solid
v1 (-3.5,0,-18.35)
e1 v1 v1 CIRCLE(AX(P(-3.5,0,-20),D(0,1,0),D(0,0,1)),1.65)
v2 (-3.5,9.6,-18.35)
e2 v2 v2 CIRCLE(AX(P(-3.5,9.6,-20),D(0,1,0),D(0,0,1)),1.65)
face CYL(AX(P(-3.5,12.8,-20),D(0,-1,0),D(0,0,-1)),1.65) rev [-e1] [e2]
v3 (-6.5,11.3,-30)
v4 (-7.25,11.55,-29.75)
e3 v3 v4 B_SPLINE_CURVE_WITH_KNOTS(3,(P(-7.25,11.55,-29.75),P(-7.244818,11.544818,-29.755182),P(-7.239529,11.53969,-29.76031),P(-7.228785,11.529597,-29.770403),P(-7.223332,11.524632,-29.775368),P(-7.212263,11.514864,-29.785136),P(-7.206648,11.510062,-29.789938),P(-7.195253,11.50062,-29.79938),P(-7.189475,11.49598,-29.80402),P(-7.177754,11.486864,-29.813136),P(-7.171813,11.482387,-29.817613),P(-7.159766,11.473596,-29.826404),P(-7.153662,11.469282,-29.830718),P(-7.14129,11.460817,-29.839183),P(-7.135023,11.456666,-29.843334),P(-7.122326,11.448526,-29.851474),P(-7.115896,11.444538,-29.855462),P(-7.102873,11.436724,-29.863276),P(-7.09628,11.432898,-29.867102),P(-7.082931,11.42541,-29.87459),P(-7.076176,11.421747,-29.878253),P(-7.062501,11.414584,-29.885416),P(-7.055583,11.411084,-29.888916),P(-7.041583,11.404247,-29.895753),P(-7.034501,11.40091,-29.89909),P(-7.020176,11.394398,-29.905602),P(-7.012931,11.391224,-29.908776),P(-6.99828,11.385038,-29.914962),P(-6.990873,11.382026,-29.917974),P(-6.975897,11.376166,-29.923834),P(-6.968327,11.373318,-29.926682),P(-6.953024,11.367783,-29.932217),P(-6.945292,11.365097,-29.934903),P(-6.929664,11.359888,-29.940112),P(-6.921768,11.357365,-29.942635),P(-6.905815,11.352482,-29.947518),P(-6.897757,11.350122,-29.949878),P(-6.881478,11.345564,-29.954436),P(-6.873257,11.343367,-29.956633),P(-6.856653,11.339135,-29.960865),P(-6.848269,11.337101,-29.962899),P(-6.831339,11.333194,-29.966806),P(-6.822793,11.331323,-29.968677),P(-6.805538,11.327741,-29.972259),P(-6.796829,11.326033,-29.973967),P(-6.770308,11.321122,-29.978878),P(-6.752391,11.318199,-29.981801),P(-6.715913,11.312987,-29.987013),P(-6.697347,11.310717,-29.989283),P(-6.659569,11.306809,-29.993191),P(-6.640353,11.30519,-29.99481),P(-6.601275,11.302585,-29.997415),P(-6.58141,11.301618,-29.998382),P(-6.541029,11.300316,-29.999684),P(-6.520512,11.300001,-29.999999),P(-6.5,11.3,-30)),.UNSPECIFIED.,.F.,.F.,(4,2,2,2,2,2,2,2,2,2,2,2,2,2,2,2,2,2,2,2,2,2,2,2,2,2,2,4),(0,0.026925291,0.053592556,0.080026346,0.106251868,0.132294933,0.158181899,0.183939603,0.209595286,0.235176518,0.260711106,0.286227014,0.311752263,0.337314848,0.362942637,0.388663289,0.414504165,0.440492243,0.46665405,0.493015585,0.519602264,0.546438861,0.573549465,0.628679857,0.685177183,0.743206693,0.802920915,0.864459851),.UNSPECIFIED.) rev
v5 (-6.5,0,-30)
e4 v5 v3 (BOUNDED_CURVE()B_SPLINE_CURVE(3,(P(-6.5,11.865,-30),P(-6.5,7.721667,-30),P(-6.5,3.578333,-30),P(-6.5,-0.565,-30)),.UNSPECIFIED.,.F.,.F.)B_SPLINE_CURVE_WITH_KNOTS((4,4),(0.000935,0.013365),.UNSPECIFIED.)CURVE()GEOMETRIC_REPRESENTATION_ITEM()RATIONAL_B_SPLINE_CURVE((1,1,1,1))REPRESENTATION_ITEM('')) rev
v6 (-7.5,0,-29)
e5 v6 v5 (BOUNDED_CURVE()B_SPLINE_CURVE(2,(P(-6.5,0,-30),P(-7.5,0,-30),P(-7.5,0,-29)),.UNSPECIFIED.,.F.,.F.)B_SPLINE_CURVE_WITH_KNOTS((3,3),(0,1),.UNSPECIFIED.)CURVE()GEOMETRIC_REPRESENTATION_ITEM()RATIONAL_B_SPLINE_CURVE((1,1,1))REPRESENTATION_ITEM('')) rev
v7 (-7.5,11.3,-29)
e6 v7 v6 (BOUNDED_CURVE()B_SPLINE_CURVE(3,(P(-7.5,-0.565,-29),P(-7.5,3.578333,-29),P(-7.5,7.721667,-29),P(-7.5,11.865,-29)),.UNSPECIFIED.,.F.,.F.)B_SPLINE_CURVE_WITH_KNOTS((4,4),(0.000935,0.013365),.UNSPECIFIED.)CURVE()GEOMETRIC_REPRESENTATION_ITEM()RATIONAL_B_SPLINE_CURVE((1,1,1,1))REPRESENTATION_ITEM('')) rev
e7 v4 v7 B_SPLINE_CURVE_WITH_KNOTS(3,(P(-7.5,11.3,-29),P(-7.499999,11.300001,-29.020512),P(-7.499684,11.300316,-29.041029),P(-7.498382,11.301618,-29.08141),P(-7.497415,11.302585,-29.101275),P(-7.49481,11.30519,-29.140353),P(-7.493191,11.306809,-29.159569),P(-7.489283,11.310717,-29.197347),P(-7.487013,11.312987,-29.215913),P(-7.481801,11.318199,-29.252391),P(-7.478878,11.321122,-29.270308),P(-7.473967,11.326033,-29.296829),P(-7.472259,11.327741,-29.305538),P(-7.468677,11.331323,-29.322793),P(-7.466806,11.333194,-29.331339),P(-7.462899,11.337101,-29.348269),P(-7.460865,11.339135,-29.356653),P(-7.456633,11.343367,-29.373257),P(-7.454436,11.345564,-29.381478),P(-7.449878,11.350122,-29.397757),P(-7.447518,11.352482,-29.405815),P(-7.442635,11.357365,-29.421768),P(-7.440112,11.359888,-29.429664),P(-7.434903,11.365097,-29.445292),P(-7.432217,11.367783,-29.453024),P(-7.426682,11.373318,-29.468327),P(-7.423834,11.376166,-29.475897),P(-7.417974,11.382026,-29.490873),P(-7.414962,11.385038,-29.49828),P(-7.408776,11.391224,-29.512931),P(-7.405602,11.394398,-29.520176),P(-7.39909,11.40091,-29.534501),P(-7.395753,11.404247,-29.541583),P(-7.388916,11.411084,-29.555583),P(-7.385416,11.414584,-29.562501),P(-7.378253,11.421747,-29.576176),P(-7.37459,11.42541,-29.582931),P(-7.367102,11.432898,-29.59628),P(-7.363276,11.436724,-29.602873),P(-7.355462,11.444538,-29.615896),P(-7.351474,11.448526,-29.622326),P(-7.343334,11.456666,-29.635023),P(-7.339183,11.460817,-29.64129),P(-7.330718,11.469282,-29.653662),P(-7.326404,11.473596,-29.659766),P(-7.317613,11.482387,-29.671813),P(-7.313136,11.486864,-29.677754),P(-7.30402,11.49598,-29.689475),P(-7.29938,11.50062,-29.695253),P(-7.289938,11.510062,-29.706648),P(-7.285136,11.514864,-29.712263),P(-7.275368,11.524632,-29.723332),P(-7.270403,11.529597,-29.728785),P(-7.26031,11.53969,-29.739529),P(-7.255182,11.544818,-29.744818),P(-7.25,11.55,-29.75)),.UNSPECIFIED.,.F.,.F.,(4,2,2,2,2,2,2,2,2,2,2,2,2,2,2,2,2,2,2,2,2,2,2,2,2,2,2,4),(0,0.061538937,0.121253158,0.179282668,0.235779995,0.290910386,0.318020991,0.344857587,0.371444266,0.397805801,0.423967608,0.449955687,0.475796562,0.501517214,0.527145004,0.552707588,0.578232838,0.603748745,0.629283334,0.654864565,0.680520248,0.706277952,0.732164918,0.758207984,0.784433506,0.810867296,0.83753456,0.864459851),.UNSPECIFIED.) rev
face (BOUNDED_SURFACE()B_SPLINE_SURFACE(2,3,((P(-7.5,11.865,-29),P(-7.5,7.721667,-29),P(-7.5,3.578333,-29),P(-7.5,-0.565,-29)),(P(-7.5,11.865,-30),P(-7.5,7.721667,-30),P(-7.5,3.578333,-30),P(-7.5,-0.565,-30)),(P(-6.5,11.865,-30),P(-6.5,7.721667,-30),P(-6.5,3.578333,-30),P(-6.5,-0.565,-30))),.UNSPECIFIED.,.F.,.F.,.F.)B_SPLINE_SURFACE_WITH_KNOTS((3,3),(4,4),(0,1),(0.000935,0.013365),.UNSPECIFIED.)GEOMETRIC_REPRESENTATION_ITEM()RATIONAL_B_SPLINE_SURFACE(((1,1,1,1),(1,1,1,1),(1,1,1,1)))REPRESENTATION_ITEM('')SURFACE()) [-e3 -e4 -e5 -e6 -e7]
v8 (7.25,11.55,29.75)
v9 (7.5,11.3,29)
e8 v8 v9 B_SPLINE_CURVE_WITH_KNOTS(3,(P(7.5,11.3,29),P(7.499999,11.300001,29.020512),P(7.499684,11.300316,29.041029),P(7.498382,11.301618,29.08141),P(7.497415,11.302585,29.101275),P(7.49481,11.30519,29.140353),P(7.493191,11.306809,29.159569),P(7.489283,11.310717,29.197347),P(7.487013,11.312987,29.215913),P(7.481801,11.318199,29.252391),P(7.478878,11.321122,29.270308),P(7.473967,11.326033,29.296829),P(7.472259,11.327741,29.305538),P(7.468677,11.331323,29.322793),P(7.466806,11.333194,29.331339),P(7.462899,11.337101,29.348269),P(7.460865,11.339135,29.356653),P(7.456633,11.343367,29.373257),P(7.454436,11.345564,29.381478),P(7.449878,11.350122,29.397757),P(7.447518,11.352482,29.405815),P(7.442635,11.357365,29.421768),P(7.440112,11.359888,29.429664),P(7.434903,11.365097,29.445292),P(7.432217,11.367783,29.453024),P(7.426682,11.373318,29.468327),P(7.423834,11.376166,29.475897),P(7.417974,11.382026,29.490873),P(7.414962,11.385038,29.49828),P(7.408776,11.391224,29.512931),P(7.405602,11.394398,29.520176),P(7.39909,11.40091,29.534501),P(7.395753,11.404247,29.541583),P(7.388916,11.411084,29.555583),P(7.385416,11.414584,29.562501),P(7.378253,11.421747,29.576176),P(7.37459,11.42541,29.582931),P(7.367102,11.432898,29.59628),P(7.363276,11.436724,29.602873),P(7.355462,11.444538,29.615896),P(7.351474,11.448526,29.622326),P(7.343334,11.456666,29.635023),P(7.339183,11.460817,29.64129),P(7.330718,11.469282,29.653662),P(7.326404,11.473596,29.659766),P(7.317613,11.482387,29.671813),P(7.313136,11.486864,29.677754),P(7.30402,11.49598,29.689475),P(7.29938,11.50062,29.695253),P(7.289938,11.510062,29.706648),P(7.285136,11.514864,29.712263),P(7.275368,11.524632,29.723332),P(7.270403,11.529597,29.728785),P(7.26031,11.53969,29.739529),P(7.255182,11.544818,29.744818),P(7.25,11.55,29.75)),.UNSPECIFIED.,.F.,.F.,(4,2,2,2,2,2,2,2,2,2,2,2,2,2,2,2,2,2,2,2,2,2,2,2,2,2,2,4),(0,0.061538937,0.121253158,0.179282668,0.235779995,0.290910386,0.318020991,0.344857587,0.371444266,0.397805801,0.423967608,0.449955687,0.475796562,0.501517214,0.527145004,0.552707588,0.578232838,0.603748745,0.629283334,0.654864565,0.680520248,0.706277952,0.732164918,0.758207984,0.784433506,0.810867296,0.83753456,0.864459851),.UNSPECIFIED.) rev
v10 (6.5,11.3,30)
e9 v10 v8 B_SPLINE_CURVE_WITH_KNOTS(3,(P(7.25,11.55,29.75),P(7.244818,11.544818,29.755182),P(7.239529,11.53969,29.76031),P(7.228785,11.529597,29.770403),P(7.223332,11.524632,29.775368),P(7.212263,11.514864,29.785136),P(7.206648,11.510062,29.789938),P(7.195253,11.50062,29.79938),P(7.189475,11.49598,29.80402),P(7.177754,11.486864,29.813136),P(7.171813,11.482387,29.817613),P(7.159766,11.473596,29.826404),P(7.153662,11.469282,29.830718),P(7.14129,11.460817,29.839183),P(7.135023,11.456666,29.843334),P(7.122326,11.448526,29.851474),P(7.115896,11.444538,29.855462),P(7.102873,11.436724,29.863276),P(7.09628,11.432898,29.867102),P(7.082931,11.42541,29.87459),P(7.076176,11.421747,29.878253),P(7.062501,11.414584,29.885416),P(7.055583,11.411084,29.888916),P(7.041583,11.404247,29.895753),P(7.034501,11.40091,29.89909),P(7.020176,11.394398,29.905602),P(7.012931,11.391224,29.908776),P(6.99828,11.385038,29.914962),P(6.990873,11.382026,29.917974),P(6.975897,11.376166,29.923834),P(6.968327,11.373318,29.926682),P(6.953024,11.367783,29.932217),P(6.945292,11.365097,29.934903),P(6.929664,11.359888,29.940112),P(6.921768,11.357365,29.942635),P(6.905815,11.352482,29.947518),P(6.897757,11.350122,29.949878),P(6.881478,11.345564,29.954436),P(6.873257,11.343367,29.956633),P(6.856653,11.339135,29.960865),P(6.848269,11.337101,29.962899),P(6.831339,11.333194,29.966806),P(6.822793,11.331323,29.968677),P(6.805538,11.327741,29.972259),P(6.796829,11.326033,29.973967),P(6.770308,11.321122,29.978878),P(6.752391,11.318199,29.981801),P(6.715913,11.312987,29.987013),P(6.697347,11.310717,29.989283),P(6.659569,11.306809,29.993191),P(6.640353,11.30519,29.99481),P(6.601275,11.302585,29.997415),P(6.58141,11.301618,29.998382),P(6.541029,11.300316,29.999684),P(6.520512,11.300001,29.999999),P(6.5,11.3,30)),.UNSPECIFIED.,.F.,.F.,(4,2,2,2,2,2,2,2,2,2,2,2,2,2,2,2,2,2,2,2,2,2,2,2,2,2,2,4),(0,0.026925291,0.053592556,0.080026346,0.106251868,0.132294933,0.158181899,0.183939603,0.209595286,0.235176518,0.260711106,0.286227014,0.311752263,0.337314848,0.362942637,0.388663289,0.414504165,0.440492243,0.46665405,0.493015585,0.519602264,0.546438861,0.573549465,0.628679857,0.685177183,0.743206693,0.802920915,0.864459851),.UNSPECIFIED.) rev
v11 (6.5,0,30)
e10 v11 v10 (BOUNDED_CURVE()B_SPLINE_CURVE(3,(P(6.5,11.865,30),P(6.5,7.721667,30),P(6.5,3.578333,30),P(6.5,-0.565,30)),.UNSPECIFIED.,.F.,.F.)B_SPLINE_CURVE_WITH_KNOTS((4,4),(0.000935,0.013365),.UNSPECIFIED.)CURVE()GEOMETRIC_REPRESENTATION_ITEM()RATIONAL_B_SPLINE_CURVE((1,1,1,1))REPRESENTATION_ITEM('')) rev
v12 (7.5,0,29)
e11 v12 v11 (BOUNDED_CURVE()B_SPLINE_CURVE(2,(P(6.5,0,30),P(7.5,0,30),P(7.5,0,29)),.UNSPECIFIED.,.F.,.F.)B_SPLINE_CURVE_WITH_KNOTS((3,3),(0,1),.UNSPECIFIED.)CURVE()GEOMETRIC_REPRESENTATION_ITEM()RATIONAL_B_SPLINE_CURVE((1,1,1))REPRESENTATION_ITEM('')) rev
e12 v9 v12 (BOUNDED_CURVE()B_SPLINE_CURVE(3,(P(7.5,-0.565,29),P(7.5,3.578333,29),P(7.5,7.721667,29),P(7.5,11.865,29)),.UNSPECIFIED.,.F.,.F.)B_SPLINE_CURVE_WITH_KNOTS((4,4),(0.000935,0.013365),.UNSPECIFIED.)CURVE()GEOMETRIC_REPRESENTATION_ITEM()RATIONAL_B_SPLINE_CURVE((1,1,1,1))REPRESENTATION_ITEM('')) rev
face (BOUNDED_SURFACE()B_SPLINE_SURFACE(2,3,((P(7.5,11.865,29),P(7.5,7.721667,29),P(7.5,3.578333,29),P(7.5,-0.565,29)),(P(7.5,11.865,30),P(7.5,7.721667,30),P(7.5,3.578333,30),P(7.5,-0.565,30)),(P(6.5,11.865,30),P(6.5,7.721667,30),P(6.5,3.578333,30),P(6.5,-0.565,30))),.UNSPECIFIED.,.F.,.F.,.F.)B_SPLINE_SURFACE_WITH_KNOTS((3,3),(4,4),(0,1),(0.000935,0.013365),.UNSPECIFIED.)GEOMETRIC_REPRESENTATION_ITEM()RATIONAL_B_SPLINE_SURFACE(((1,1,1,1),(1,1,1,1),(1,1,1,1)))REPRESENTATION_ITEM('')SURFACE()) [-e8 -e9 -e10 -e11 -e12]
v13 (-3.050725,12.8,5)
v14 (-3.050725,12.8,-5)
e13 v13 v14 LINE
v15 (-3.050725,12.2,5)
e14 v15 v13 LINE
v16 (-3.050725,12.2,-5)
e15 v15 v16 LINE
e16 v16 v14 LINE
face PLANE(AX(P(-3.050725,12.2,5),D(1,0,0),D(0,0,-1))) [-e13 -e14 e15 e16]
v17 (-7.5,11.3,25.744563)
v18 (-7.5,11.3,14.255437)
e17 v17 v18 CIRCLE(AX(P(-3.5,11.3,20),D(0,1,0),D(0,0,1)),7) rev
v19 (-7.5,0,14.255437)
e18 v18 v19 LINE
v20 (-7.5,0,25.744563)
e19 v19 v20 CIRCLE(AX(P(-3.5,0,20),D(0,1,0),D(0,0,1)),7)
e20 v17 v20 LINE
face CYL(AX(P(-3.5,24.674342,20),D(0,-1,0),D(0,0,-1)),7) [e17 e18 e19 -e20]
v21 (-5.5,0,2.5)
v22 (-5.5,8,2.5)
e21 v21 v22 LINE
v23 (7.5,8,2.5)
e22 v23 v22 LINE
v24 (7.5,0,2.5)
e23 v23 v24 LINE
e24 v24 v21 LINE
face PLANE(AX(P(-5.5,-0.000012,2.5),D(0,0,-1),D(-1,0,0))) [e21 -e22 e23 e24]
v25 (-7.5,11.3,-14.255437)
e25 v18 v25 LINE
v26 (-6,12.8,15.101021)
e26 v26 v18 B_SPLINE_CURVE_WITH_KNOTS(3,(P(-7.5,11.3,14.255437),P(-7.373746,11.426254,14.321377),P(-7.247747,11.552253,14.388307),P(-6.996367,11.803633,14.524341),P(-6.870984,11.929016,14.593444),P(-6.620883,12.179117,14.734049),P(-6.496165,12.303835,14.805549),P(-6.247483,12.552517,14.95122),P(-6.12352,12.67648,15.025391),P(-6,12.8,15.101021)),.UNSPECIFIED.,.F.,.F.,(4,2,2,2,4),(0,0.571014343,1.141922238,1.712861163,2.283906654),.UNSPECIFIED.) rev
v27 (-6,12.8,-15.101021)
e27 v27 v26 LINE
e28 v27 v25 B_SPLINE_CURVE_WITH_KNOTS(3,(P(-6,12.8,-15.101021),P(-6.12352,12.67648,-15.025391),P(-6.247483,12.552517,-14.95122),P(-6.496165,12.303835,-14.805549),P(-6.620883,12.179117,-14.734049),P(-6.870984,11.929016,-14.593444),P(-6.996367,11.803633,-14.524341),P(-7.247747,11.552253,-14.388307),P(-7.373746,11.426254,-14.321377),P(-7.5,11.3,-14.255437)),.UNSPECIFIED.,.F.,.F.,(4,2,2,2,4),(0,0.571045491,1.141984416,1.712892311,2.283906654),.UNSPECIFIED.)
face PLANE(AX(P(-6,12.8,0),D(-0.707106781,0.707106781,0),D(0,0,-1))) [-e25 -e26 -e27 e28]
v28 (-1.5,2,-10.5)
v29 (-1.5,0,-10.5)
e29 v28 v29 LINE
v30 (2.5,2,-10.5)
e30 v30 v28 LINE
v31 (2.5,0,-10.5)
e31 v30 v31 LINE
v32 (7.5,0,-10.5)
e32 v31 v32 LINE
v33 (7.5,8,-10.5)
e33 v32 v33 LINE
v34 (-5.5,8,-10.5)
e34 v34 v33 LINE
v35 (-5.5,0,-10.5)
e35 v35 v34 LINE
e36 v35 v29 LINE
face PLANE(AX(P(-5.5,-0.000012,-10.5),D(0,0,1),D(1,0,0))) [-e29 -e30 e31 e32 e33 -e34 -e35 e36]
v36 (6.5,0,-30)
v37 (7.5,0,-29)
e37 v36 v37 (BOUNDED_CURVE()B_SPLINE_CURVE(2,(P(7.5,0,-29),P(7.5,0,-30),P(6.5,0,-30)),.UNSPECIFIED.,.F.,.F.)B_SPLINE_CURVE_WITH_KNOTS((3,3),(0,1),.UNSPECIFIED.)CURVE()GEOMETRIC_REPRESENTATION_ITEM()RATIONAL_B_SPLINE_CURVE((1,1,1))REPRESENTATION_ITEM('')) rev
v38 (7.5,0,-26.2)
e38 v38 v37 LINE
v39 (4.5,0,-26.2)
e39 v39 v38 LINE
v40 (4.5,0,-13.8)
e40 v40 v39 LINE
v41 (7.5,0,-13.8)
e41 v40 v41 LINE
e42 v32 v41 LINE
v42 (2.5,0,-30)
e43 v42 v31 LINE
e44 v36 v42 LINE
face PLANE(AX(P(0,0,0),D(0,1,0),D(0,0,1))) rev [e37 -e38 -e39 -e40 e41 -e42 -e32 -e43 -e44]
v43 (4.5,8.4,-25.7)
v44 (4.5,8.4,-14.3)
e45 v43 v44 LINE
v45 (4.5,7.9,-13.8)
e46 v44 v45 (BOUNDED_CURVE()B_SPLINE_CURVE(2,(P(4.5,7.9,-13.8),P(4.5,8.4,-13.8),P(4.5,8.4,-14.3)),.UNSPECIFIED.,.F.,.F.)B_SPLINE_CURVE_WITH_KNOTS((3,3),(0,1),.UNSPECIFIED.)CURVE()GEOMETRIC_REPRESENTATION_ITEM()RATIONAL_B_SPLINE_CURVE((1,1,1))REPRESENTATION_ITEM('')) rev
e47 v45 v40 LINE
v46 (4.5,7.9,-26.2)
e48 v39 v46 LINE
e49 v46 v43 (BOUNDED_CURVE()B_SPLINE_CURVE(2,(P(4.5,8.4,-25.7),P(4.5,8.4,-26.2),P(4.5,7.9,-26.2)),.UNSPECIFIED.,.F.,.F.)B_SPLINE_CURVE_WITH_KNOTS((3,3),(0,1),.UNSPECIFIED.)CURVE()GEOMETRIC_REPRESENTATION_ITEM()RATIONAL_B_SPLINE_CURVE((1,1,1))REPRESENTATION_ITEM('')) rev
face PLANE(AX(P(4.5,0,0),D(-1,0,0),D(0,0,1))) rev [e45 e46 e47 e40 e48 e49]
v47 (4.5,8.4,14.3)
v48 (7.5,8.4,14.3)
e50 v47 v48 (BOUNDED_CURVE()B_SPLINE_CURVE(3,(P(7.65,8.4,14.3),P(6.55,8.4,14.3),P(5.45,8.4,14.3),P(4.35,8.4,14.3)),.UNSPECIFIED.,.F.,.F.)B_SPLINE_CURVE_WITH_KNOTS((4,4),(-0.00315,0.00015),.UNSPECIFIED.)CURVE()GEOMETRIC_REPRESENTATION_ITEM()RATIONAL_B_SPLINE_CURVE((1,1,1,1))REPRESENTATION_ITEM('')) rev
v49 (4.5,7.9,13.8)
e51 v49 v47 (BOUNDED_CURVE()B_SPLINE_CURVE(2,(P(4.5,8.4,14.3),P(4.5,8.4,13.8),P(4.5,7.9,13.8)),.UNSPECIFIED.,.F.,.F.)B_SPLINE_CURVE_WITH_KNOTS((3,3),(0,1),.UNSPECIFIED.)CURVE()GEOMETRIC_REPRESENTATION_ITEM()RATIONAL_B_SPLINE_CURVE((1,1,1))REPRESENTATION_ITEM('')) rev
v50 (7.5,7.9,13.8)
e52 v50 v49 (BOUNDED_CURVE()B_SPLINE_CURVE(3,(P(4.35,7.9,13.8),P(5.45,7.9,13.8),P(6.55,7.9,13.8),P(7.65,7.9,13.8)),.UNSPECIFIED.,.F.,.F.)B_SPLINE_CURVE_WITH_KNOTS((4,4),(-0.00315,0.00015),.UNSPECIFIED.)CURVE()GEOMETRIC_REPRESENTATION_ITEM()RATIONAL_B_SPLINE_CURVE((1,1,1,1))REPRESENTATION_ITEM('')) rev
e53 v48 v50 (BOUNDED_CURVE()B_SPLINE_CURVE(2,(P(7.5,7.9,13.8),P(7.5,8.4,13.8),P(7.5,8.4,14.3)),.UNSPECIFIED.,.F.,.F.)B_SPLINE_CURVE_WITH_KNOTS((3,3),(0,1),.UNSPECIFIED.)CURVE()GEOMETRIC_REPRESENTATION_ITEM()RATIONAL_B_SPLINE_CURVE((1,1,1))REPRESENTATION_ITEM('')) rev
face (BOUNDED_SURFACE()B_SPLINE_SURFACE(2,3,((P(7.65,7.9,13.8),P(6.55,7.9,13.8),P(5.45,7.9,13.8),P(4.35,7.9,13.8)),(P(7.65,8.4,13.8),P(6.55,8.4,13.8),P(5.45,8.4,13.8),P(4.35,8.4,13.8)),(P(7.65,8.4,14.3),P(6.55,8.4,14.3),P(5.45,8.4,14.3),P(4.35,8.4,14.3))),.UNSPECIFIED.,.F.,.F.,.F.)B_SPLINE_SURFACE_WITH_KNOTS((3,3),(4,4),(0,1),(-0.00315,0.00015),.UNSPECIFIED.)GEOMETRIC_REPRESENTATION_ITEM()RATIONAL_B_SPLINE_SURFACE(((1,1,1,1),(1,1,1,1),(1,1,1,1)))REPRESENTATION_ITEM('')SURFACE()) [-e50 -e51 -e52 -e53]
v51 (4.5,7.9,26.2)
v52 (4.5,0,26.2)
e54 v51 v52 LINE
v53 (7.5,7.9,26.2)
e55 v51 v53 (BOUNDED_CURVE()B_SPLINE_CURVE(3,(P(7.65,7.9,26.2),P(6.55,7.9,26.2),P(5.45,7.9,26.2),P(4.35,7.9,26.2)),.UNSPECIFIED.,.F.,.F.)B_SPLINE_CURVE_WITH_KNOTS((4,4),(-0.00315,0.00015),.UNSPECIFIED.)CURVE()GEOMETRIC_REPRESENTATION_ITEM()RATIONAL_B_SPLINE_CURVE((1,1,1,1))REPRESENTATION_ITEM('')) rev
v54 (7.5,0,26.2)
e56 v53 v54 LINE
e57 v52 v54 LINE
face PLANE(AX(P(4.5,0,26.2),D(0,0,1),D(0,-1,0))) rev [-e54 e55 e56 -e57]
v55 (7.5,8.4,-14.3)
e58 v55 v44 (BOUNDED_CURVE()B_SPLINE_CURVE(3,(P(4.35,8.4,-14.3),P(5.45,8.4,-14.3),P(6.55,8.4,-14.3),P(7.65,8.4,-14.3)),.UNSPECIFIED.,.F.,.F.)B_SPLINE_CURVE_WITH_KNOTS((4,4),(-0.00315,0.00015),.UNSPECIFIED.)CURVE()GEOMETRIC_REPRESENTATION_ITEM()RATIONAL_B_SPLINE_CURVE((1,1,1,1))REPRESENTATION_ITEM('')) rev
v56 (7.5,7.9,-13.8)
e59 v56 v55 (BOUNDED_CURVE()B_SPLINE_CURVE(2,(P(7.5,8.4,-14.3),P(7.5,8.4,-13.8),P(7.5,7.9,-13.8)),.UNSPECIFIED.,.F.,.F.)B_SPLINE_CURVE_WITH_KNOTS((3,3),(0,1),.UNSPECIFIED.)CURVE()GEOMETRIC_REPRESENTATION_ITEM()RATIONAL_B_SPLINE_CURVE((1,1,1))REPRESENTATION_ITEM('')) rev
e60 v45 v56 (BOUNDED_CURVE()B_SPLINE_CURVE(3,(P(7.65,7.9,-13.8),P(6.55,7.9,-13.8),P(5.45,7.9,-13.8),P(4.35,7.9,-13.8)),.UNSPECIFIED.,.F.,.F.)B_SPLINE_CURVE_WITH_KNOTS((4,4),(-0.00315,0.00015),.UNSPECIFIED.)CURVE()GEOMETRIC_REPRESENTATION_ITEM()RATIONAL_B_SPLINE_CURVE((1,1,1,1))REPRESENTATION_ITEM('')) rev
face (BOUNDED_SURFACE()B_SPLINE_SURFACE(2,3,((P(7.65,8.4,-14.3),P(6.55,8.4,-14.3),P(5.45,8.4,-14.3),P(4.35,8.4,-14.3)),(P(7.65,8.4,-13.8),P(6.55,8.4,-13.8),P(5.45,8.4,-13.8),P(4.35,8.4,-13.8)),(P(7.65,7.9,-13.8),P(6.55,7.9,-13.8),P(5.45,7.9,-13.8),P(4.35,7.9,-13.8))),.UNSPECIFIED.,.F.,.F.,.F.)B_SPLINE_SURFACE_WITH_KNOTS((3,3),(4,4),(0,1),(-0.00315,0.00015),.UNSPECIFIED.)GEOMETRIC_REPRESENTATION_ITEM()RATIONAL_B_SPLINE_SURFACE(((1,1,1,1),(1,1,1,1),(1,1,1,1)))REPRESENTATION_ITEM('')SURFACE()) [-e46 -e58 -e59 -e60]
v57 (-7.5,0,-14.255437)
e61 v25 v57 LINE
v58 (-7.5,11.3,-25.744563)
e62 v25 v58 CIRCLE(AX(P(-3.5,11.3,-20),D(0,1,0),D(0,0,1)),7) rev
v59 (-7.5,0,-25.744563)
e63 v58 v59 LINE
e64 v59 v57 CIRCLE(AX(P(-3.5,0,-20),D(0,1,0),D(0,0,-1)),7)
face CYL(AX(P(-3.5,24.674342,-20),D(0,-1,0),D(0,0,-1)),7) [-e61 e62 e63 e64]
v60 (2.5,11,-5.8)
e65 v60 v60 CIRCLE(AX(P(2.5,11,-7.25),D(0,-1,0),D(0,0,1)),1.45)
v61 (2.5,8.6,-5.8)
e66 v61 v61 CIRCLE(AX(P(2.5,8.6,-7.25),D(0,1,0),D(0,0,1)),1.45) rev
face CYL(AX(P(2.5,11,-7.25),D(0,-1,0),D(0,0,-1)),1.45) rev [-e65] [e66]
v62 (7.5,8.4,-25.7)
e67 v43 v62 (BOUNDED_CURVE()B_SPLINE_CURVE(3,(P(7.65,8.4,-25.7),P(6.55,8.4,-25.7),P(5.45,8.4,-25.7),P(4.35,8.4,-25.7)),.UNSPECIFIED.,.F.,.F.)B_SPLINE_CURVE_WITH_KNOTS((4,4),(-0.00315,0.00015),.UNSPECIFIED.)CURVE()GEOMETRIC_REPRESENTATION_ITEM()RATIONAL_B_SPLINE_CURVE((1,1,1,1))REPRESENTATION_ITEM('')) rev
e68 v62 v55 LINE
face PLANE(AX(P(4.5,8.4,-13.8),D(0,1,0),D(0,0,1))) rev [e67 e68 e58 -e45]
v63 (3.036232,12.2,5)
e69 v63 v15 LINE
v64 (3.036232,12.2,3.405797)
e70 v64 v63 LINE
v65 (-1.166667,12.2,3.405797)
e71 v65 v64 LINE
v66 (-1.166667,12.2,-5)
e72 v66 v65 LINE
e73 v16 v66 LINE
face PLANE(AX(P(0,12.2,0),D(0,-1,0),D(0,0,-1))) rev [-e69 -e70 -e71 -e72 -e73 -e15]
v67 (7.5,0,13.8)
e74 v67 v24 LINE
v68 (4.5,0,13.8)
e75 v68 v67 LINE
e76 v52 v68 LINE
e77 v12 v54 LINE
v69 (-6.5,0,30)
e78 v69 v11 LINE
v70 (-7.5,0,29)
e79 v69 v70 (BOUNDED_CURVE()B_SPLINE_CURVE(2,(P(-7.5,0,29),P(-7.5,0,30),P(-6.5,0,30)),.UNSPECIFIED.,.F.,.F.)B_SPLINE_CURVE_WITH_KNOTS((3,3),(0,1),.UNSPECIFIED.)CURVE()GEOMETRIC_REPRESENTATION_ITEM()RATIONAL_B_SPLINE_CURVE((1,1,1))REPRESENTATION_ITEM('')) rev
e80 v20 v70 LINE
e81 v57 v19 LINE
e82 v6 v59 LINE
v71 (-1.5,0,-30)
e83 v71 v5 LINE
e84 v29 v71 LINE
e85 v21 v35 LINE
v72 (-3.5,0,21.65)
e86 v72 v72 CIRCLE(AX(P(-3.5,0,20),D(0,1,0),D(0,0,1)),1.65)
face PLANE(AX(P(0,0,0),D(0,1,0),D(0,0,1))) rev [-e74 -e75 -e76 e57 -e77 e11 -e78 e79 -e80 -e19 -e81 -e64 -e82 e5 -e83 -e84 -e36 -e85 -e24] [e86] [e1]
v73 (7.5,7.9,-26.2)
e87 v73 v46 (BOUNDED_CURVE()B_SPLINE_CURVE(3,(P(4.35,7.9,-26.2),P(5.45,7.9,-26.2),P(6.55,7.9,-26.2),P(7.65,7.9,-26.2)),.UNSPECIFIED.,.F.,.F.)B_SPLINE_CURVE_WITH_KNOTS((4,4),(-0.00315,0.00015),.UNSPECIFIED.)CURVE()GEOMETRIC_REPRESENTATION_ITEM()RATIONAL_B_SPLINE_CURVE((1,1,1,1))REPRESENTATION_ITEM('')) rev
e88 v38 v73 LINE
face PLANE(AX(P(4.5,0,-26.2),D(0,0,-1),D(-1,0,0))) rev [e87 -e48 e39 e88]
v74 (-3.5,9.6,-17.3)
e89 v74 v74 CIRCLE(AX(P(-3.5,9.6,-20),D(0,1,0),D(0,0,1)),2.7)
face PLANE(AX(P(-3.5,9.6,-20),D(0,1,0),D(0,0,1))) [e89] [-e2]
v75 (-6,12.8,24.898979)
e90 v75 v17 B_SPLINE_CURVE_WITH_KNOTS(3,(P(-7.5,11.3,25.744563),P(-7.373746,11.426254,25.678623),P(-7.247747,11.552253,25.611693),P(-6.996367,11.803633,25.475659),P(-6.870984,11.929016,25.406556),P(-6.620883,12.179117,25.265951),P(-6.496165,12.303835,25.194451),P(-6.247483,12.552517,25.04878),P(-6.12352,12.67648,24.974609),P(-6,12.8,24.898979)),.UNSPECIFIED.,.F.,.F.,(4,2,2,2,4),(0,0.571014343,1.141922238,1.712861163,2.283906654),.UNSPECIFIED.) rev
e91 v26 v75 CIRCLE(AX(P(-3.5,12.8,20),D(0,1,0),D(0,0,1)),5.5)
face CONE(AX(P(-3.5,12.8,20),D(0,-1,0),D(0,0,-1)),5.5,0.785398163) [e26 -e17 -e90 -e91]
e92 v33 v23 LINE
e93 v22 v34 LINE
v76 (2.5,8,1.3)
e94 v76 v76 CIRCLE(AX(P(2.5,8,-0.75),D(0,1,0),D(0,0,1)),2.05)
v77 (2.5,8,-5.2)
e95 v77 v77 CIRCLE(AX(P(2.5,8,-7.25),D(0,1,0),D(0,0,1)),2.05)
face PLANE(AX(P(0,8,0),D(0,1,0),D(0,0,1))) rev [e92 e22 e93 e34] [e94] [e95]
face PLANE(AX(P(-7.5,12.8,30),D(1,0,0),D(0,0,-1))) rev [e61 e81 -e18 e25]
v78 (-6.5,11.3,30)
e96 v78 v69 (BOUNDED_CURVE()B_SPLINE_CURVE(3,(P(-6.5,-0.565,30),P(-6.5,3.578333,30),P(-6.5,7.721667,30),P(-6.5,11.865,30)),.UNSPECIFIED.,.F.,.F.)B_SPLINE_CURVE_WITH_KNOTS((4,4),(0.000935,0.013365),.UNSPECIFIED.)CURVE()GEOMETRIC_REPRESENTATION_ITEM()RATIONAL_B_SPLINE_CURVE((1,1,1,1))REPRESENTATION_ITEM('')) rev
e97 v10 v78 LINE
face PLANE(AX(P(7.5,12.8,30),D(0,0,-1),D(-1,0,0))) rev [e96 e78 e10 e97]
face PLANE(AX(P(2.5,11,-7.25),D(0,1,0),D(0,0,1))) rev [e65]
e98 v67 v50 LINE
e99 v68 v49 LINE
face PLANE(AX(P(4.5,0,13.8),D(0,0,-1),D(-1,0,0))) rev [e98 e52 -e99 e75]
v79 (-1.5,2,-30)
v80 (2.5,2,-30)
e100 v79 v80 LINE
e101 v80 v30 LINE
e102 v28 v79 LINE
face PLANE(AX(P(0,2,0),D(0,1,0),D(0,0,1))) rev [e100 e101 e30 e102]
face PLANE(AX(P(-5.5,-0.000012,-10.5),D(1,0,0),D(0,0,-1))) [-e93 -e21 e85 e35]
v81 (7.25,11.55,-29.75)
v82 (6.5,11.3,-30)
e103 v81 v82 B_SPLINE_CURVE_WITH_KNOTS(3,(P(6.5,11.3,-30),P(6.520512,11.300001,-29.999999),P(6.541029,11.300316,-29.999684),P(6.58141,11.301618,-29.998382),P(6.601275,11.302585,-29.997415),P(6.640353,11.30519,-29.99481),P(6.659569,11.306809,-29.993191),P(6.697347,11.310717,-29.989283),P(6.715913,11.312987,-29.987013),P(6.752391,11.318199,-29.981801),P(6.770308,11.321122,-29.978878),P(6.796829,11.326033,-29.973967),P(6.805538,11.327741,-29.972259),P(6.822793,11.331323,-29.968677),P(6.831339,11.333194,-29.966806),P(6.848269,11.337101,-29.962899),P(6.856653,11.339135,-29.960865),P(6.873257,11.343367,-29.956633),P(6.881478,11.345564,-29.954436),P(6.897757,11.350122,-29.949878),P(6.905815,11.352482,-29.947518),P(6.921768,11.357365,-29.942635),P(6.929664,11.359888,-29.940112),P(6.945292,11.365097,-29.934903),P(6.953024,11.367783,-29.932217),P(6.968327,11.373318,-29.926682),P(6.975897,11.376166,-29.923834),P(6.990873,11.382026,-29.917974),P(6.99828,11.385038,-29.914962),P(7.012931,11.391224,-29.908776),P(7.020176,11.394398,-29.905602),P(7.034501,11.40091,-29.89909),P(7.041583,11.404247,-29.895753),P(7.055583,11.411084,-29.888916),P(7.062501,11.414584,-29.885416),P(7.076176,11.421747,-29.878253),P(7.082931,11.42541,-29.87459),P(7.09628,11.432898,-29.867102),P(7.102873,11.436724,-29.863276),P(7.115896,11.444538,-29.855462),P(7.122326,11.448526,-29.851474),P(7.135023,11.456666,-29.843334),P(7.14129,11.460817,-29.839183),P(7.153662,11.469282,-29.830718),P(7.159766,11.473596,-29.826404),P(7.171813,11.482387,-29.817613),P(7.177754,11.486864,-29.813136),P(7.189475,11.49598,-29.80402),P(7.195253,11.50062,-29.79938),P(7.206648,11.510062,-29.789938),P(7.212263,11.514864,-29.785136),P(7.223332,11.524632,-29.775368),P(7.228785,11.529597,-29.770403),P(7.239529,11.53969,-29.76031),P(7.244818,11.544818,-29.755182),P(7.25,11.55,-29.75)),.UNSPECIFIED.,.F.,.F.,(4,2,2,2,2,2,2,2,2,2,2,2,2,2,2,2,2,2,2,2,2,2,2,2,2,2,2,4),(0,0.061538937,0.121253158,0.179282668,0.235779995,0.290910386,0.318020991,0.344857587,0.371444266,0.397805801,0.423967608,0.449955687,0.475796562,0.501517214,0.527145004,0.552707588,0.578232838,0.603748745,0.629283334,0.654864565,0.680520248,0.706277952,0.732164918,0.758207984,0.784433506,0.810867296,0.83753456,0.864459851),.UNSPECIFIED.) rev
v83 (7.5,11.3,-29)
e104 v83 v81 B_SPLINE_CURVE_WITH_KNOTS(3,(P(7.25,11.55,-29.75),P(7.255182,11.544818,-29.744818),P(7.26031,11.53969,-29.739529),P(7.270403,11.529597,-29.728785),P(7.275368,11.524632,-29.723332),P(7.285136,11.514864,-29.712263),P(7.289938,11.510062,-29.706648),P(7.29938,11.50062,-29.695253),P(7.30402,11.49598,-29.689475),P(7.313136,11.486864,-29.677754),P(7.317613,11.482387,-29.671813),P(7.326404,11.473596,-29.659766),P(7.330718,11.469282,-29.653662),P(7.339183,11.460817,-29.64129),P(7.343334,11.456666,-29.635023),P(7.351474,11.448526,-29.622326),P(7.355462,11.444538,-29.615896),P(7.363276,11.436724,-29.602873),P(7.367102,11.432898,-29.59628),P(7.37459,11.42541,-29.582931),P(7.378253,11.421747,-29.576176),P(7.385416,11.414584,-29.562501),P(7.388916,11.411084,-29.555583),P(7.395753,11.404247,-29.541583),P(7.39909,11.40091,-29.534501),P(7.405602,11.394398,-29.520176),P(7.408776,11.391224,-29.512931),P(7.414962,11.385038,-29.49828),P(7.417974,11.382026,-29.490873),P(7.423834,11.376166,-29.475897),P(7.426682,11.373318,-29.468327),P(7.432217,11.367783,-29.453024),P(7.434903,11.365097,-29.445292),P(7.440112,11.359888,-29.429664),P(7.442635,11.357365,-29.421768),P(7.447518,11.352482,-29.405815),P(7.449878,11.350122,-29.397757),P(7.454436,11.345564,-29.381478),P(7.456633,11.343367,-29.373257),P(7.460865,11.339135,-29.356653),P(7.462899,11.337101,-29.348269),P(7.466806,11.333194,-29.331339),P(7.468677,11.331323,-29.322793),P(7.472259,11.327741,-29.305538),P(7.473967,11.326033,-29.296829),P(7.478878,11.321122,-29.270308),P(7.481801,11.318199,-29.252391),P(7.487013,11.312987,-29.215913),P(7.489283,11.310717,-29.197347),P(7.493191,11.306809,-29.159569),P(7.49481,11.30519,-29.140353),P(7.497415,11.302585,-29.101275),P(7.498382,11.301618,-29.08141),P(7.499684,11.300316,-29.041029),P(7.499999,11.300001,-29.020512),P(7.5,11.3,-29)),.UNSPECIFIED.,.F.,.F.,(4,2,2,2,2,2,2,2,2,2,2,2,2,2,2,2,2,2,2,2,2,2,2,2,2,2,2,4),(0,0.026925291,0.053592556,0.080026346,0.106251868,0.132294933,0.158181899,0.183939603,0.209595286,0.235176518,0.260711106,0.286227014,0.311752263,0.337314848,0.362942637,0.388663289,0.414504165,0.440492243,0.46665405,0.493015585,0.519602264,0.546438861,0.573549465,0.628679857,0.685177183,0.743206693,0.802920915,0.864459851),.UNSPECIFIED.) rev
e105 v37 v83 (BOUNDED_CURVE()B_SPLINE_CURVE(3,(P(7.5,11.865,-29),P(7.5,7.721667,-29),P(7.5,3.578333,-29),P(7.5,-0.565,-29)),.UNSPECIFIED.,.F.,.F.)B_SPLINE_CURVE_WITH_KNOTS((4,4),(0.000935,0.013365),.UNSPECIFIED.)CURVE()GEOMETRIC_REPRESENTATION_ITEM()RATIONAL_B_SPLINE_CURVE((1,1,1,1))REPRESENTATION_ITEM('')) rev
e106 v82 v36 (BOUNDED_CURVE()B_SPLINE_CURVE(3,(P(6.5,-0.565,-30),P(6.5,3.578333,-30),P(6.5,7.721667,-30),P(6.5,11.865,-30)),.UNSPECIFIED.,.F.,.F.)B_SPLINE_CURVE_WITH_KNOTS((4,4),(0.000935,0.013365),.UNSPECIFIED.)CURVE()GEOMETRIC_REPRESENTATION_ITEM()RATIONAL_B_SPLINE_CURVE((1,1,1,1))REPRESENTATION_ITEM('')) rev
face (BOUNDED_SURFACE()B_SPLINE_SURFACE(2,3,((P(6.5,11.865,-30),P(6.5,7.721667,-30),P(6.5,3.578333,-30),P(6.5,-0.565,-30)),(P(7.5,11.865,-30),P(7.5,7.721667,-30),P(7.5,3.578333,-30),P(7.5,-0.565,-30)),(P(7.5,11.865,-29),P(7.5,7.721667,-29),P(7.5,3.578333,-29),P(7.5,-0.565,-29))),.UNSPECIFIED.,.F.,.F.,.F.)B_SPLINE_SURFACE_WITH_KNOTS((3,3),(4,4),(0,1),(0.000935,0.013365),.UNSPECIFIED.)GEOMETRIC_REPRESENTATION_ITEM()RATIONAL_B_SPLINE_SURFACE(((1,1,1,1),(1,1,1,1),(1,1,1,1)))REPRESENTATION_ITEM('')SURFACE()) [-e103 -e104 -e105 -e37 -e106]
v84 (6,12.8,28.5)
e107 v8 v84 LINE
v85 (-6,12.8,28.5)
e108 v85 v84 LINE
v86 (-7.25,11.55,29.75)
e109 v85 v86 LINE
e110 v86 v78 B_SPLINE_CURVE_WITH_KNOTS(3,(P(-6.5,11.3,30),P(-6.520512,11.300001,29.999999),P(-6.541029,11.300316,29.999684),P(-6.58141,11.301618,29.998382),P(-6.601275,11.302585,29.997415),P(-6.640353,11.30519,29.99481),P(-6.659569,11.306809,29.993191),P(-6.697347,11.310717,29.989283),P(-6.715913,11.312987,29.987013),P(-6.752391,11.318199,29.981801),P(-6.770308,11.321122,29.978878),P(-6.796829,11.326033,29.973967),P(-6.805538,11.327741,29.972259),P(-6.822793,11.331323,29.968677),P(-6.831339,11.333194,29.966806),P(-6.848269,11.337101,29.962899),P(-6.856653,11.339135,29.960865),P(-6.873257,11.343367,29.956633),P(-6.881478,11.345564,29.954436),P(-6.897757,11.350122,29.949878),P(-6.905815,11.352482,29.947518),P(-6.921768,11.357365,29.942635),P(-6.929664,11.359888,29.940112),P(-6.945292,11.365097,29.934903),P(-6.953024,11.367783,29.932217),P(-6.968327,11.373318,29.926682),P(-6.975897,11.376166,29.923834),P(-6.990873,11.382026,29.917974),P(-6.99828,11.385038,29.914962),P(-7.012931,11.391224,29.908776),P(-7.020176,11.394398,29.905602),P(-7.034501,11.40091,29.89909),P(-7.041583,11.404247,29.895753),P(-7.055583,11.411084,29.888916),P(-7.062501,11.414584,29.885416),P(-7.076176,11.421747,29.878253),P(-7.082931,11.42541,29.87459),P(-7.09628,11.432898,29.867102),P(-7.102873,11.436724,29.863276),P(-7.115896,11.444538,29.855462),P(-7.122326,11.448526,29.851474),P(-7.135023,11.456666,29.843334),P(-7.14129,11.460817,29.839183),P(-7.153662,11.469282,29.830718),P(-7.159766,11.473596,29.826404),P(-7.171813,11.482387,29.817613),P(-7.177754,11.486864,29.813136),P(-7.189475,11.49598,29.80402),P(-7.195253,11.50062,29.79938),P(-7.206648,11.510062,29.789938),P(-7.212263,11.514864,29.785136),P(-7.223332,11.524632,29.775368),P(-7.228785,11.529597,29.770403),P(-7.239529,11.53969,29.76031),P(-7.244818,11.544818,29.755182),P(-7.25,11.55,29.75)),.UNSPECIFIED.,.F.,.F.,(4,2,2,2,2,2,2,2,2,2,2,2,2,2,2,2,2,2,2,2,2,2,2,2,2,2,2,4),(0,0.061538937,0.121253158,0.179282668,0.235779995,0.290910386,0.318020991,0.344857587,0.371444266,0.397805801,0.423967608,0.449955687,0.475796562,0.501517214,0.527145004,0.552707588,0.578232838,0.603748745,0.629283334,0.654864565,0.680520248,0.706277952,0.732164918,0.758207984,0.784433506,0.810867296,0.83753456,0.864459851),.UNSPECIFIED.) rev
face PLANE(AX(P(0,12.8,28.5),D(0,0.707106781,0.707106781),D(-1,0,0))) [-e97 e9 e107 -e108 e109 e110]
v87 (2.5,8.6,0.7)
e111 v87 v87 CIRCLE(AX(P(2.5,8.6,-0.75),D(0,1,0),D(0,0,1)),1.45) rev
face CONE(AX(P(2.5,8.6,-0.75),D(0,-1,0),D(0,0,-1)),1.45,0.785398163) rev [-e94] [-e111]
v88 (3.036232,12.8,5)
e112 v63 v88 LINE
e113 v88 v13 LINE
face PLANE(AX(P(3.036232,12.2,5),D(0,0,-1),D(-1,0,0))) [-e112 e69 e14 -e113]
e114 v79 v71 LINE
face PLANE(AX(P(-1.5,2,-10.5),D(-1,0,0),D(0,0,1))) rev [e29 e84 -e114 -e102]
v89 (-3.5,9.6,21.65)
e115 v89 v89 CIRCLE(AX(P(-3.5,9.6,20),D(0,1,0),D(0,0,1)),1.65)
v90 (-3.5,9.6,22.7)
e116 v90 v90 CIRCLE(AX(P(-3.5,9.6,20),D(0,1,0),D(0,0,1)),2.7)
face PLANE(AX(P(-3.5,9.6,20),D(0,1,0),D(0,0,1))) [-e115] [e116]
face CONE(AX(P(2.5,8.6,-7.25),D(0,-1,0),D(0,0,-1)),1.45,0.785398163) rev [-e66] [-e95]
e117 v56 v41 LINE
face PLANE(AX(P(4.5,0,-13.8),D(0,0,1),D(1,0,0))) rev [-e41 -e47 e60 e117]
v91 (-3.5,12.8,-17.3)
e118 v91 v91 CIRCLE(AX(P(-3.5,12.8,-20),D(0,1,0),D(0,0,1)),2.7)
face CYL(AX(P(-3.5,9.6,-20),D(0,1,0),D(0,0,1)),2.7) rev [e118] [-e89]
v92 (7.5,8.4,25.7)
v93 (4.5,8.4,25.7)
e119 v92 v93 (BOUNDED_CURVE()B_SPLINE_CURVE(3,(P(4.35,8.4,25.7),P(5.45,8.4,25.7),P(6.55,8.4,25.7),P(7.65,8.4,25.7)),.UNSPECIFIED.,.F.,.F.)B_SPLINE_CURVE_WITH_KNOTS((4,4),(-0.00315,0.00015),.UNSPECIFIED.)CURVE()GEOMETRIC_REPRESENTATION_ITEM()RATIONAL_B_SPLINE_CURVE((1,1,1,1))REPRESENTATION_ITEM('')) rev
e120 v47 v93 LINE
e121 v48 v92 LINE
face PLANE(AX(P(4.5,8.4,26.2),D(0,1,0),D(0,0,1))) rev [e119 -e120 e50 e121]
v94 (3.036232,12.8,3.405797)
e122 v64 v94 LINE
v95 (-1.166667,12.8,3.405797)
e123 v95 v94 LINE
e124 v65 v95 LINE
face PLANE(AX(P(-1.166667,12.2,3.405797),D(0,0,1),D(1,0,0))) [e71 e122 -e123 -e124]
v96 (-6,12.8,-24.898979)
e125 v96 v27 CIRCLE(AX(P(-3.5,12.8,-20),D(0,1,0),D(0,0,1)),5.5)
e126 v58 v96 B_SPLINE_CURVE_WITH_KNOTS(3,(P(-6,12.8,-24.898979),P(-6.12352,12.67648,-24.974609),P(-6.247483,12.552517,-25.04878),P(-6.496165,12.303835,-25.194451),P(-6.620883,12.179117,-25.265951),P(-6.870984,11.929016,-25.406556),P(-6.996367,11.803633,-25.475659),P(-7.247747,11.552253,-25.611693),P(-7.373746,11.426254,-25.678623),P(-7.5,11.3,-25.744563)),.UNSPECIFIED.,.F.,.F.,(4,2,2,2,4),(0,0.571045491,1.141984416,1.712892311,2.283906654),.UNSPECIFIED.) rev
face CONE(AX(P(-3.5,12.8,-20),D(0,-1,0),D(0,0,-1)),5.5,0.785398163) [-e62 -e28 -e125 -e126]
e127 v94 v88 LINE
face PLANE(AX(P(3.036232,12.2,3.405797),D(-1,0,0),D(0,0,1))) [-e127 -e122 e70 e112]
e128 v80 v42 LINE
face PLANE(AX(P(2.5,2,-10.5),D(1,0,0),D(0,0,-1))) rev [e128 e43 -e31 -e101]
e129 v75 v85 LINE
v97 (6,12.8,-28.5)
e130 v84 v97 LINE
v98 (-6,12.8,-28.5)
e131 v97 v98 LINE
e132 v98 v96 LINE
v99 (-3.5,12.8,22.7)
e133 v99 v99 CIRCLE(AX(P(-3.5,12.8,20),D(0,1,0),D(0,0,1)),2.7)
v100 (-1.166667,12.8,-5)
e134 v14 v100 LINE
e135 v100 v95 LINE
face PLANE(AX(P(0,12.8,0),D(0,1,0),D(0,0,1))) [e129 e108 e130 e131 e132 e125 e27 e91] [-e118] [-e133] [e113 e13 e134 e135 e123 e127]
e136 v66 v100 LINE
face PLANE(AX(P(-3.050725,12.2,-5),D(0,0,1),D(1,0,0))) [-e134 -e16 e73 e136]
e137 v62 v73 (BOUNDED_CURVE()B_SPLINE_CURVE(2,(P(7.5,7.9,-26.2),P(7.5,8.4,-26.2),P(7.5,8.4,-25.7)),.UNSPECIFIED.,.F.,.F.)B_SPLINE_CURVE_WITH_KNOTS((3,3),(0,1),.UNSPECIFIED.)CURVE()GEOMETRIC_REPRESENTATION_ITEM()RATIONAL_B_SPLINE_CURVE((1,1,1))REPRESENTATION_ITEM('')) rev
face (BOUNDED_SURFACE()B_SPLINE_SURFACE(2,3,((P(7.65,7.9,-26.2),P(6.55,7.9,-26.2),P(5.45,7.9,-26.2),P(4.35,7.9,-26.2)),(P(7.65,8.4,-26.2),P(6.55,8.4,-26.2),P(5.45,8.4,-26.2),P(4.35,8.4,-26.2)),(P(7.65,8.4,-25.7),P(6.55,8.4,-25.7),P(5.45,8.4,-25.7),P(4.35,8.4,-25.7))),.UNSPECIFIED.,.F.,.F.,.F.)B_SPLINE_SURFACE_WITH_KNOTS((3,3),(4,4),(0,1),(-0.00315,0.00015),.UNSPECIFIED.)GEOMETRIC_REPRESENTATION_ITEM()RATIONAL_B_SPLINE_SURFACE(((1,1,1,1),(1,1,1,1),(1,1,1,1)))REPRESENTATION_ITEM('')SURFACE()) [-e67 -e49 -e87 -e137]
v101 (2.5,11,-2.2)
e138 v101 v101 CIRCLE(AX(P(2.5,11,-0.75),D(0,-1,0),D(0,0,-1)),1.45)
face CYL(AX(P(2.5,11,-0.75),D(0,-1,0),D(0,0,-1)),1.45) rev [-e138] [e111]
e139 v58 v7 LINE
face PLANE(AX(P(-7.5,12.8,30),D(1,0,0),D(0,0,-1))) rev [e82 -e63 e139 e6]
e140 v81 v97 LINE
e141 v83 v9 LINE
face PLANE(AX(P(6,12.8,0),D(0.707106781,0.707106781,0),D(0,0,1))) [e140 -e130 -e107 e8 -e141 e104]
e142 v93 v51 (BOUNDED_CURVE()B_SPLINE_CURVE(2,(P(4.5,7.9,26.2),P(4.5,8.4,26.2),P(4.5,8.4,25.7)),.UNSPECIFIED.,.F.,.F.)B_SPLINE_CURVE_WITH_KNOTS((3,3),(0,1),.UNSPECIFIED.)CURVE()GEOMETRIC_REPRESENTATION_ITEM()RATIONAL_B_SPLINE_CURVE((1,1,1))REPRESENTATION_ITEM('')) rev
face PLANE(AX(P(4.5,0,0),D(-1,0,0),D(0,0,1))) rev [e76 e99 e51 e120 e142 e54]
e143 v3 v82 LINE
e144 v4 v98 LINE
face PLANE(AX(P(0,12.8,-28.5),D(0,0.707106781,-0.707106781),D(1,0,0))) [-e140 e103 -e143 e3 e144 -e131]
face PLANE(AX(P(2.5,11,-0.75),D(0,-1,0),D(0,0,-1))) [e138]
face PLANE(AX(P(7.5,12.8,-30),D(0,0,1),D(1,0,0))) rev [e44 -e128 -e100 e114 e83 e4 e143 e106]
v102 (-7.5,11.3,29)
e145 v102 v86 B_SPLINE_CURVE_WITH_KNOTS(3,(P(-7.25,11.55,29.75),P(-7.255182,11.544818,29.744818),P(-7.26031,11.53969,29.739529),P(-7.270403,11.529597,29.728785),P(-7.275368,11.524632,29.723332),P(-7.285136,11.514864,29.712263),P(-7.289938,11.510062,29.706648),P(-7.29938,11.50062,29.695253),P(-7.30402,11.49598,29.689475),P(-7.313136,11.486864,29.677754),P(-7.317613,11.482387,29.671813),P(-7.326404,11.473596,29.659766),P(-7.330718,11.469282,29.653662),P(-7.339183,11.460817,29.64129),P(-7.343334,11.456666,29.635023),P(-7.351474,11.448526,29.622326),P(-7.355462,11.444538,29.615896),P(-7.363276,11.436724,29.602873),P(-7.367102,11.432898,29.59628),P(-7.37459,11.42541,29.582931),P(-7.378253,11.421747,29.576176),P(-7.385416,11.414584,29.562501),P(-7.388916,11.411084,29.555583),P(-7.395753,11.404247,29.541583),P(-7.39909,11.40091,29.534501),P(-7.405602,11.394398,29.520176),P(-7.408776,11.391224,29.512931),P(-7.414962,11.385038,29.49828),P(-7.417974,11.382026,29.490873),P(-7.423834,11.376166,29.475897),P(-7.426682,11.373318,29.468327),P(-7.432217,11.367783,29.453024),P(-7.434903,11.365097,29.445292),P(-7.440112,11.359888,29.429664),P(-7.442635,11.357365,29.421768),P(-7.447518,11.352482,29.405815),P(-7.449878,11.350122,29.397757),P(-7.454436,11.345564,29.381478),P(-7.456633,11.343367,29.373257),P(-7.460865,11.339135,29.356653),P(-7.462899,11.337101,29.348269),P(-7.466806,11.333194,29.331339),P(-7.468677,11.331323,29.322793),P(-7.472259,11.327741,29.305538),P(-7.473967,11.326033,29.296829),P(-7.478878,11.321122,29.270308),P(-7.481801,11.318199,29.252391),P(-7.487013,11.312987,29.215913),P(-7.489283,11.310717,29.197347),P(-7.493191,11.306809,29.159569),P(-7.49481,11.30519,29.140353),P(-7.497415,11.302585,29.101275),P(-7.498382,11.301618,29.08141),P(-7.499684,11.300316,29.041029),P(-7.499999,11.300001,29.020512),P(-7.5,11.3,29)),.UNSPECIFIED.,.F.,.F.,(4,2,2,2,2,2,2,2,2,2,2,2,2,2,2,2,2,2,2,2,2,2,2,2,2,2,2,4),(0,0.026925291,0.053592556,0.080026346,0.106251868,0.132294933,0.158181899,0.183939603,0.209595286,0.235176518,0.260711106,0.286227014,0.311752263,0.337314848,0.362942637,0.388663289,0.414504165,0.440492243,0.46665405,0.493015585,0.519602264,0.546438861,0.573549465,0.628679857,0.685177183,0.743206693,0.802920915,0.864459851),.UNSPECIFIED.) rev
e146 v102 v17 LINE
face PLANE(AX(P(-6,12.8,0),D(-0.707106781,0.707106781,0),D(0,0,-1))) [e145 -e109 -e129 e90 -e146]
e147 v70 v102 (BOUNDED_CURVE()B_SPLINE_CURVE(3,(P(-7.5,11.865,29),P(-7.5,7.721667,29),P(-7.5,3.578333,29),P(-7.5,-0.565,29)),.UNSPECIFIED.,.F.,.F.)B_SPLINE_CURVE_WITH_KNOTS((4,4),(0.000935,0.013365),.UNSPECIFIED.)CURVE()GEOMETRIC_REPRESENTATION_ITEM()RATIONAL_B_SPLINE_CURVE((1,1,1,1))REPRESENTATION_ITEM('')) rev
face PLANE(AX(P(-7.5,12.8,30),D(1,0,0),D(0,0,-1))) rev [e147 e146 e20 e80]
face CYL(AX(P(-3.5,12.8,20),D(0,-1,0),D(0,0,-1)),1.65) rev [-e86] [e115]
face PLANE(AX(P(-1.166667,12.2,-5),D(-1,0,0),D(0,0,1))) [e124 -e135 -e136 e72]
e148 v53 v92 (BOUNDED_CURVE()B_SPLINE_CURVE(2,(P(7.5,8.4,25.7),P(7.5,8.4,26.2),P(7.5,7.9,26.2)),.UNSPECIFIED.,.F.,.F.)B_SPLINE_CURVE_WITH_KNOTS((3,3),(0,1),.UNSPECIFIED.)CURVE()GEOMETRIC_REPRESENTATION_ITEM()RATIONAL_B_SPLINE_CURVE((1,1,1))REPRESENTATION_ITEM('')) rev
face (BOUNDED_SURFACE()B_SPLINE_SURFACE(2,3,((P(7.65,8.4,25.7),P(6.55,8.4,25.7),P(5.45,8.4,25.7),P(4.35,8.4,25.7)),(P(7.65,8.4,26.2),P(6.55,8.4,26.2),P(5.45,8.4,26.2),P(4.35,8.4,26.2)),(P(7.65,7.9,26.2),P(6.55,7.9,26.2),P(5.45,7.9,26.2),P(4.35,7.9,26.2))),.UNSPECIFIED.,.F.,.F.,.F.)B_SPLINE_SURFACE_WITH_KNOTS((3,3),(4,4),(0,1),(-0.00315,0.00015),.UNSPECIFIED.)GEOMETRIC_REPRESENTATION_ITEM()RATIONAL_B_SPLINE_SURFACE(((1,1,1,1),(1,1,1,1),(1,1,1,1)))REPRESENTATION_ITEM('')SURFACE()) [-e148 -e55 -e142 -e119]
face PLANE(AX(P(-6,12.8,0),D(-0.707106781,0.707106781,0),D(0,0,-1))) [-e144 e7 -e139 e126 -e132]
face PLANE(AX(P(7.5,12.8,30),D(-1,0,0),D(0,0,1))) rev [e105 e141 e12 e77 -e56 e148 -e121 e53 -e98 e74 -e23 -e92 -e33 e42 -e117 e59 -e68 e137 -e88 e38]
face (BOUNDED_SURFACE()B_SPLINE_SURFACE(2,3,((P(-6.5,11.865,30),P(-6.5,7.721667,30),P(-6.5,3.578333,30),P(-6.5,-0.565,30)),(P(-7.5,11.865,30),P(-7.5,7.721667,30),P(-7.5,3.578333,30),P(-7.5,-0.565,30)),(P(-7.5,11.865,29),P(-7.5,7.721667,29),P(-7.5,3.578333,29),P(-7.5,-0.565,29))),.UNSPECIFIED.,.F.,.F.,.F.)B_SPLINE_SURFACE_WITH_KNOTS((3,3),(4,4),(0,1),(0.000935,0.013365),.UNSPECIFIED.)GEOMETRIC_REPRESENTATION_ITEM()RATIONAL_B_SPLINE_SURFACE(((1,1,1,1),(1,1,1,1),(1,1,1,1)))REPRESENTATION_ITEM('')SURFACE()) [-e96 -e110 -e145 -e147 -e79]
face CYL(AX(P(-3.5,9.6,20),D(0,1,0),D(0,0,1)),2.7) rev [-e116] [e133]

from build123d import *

# Parameters (mm, degrees)
SKETCH1_W               = 15
SKETCH1_H               = 60
SKETCH1_R               = 1.65
BOSS_EXTRUDE1_DEPTH     = 12.8
CUT_EXTRUDE3_DEPTH      = 34.467745667
CUT_EXTRUDE3_DEPTH_BACK = 8
SKETCH5_W               = 13
SKETCH5_H               = 13
SKETCH6_R               = 1.45
CUT_EXTRUDE4_DEPTH      = 3
SKETCH8_R               = 2.7
CUT_EXTRUDE6_DEPTH      = 3.2
SKETCH9_W               = 4
SKETCH9_H               = 19.5
CUT_EXTRUDE7_DEPTH      = 2
SKETCH10_W              = 12.4
SKETCH10_H              = 8.4
CUT_EXTRUDE8_DEPTH      = 3
CUT_EXTRUDE9_DEPTH      = 0.6
FILLET1_SIZE            = 0.5
BOSS_EXTRUDE2_DEPTH     = 12.8
CHAMFER2_SIZE           = 1.5
FILLET3_SIZE            = 1
CHAMFER3_SIZE           = 0.6


with BuildPart() as part:
    # Sketch1 → Boss-Extrude1 (new body)
    with BuildSketch(Plane(origin=(0, 0, 0), x_dir=(1, 0, 0), z_dir=(0, 1, 0))):
        Rectangle(SKETCH1_W, SKETCH1_H)
        with Locations(Location((-3.5, 20, 0), (0, 0, 270))):
            Circle(SKETCH1_R, mode=Mode.SUBTRACT)
        with Locations(Location((-3.5, -20, 0), (0, 0, 270))):
            Circle(SKETCH1_R, mode=Mode.SUBTRACT)
    extrude(amount=BOSS_EXTRUDE1_DEPTH)

    # Sketch5 → Cut-Extrude3 (cut, two sides: drawn at the far end of the back side and taken through both)
    with BuildSketch(Plane.XZ.offset(-CUT_EXTRUDE3_DEPTH_BACK)):
        with Locations((1, -4)):
            Rectangle(SKETCH5_W, SKETCH5_H)
    extrude(amount=CUT_EXTRUDE3_DEPTH + CUT_EXTRUDE3_DEPTH_BACK, mode=Mode.SUBTRACT)

    # Sketch6 → Cut-Extrude4 (cut)
    with BuildSketch(Plane.XZ.offset(-8)):
        with Locations(Location((2.5, -0.75, 0), (0, 0, 270))):
            Circle(SKETCH6_R)
        with Locations(Location((2.5, -7.25, 0), (0, 0, 90))):
            Circle(SKETCH6_R)
    extrude(amount=-CUT_EXTRUDE4_DEPTH, mode=Mode.SUBTRACT)

    # Sketch8 → Cut-Extrude6 (cut)
    with BuildSketch(Plane(origin=(0, 12.8, 0), x_dir=(1, 0, 0), z_dir=(0, 1, 0))):
        with Locations(Location((-3.5, 20, 0), (0, 0, 270))):
            Circle(SKETCH8_R)
        with Locations(Location((-3.5, -20, 0), (0, 0, 270))):
            Circle(SKETCH8_R)
    extrude(amount=-CUT_EXTRUDE6_DEPTH, mode=Mode.SUBTRACT)

    # Sketch9 → Cut-Extrude7 (cut)
    with BuildSketch(Plane.XZ):
        with Locations((0.5, -20.25)):
            Rectangle(SKETCH9_W, SKETCH9_H)
    extrude(amount=-CUT_EXTRUDE7_DEPTH, mode=Mode.SUBTRACT)

    # Sketch10 → Cut-Extrude8 (cut)
    with BuildSketch(Plane(origin=(7.5, 0, 0), x_dir=(0, 0, -1), z_dir=(1, 0, 0))):
        with Locations((-20, 4.2)):
            Rectangle(SKETCH10_W, SKETCH10_H)
        with Locations((20, 4.2)):
            Rectangle(SKETCH10_W, SKETCH10_H)
    extrude(amount=-CUT_EXTRUDE8_DEPTH, mode=Mode.SUBTRACT)

    # Sketch11 → Cut-Extrude9 (cut)
    with BuildSketch(Plane(origin=(0, 12.8, 0), x_dir=(1, 0, 0), z_dir=(0, 1, 0))):
        Polygon((-3.050724638, -5), (-3.050724638, 5), (-1.166666667, 5), (-1.166666667, -3.405797101), (3.036231884, -3.405797101), (3.036231884, -5), align=None)
    extrude(amount=-CUT_EXTRUDE9_DEPTH, mode=Mode.SUBTRACT)

    # Fillet1
    # a fillet whose section is not a circle: 0.5 mm, written as the material it adds along each edge
    with BuildSketch(Plane(origin=(7.5, 8.4, 26.2), x_dir=(0, 0, -1), z_dir=(-1, 0, 0)), Plane(origin=(7.5, 8.4, 13.8), x_dir=(0, -1, 0), z_dir=(-1, 0, 0)), Plane(origin=(7.5, 8.4, -13.8), x_dir=(0, 0, -1), z_dir=(-1, 0, 0)), Plane(origin=(7.5, 8.4, -26.2), x_dir=(0, -1, 0), z_dir=(-1, 0, 0))) as fillet1_piece_1:
        with BuildLine():
            Bezier((FILLET1_SIZE, 0), (0, 0), (0, FILLET1_SIZE), weights=[1, 1, 1])
            Line((0, FILLET1_SIZE), (0, 0))
            Line((0, 0), (FILLET1_SIZE, 0))
        make_face()
    extrude(amount=4.25)

    # Sketch12 → Boss-Extrude2 (add)
    with BuildSketch(Plane(origin=(0, 0, 0), x_dir=(1, 0, 0), z_dir=(0, 1, 0))):
        with BuildLine():
            Line((-7.5, 25.744562647), (-7.5, 14.255437353))
            ThreePointArc((-7.5, 14.255437353), (-10.5, 20), (-7.5, 25.744562647))
        make_face()
        with BuildLine():
            Line((-7.5, -25.744562647), (-7.5, -14.255437353))
            ThreePointArc((-7.5, -14.255437353), (-10.5, -20), (-7.5, -25.744562647))
        make_face()
    extrude(amount=BOSS_EXTRUDE2_DEPTH)

    # Chamfer2
    chamfer2_edges = [part.edges().sort_by_distance(p)[0] for p in [
        (7.5, 12.8, 0),
        (-7.5, 12.8, 0),
        (0, 12.8, -30),
        (-7.5, 12.8, 27.872281323),
        (-10.5, 12.8, -20),
        (-10.5, 12.8, 20),
        (-7.5, 12.8, -27.872281323),
        (0, 12.8, 30),
    ]]
    chamfer(chamfer2_edges, length=CHAMFER2_SIZE)

    # Fillet3
    # a fillet whose section is not a circle: 1 mm, written as the material it takes off along each edge
    with BuildSketch(Plane(origin=(-7.5, -2.5, -30), x_dir=(1, 0, 0), z_dir=(0, 1, 0)), Plane(origin=(7.5, -2.5, -30), x_dir=(0, 0, 1), z_dir=(0, 1, 0))) as fillet3_piece_1:
        with BuildLine():
            Bezier((FILLET3_SIZE, 0), (0, 0), (0, -FILLET3_SIZE), weights=[1, 1, 1])
            Line((0, -FILLET3_SIZE), (0, 0))
            Line((0, 0), (FILLET3_SIZE, 0))
        make_face()
    extrude(amount=16.3, mode=Mode.SUBTRACT)
    with BuildSketch(Plane(origin=(7.5, -2.5, 30), x_dir=(0, 0, -1), z_dir=(0, 1, 0)), Plane(origin=(-7.5, -2.5, 30), x_dir=(1, 0, 0), z_dir=(0, 1, 0))) as fillet3_piece_2:
        with BuildLine():
            Bezier((FILLET3_SIZE, 0), (0, 0), (0, FILLET3_SIZE), weights=[1, 1, 1])
            Line((0, FILLET3_SIZE), (0, 0))
            Line((0, 0), (FILLET3_SIZE, 0))
        make_face()
    extrude(amount=16.3, mode=Mode.SUBTRACT)

    # Chamfer3
    chamfer3_edges = [part.edges().sort_by_distance(p)[0] for p in [
        (2.5, 8, 0.7),
        (2.5, 8, -8.7),
    ]]
    chamfer(chamfer3_edges, length=CHAMFER3_SIZE)


solid = part.part
